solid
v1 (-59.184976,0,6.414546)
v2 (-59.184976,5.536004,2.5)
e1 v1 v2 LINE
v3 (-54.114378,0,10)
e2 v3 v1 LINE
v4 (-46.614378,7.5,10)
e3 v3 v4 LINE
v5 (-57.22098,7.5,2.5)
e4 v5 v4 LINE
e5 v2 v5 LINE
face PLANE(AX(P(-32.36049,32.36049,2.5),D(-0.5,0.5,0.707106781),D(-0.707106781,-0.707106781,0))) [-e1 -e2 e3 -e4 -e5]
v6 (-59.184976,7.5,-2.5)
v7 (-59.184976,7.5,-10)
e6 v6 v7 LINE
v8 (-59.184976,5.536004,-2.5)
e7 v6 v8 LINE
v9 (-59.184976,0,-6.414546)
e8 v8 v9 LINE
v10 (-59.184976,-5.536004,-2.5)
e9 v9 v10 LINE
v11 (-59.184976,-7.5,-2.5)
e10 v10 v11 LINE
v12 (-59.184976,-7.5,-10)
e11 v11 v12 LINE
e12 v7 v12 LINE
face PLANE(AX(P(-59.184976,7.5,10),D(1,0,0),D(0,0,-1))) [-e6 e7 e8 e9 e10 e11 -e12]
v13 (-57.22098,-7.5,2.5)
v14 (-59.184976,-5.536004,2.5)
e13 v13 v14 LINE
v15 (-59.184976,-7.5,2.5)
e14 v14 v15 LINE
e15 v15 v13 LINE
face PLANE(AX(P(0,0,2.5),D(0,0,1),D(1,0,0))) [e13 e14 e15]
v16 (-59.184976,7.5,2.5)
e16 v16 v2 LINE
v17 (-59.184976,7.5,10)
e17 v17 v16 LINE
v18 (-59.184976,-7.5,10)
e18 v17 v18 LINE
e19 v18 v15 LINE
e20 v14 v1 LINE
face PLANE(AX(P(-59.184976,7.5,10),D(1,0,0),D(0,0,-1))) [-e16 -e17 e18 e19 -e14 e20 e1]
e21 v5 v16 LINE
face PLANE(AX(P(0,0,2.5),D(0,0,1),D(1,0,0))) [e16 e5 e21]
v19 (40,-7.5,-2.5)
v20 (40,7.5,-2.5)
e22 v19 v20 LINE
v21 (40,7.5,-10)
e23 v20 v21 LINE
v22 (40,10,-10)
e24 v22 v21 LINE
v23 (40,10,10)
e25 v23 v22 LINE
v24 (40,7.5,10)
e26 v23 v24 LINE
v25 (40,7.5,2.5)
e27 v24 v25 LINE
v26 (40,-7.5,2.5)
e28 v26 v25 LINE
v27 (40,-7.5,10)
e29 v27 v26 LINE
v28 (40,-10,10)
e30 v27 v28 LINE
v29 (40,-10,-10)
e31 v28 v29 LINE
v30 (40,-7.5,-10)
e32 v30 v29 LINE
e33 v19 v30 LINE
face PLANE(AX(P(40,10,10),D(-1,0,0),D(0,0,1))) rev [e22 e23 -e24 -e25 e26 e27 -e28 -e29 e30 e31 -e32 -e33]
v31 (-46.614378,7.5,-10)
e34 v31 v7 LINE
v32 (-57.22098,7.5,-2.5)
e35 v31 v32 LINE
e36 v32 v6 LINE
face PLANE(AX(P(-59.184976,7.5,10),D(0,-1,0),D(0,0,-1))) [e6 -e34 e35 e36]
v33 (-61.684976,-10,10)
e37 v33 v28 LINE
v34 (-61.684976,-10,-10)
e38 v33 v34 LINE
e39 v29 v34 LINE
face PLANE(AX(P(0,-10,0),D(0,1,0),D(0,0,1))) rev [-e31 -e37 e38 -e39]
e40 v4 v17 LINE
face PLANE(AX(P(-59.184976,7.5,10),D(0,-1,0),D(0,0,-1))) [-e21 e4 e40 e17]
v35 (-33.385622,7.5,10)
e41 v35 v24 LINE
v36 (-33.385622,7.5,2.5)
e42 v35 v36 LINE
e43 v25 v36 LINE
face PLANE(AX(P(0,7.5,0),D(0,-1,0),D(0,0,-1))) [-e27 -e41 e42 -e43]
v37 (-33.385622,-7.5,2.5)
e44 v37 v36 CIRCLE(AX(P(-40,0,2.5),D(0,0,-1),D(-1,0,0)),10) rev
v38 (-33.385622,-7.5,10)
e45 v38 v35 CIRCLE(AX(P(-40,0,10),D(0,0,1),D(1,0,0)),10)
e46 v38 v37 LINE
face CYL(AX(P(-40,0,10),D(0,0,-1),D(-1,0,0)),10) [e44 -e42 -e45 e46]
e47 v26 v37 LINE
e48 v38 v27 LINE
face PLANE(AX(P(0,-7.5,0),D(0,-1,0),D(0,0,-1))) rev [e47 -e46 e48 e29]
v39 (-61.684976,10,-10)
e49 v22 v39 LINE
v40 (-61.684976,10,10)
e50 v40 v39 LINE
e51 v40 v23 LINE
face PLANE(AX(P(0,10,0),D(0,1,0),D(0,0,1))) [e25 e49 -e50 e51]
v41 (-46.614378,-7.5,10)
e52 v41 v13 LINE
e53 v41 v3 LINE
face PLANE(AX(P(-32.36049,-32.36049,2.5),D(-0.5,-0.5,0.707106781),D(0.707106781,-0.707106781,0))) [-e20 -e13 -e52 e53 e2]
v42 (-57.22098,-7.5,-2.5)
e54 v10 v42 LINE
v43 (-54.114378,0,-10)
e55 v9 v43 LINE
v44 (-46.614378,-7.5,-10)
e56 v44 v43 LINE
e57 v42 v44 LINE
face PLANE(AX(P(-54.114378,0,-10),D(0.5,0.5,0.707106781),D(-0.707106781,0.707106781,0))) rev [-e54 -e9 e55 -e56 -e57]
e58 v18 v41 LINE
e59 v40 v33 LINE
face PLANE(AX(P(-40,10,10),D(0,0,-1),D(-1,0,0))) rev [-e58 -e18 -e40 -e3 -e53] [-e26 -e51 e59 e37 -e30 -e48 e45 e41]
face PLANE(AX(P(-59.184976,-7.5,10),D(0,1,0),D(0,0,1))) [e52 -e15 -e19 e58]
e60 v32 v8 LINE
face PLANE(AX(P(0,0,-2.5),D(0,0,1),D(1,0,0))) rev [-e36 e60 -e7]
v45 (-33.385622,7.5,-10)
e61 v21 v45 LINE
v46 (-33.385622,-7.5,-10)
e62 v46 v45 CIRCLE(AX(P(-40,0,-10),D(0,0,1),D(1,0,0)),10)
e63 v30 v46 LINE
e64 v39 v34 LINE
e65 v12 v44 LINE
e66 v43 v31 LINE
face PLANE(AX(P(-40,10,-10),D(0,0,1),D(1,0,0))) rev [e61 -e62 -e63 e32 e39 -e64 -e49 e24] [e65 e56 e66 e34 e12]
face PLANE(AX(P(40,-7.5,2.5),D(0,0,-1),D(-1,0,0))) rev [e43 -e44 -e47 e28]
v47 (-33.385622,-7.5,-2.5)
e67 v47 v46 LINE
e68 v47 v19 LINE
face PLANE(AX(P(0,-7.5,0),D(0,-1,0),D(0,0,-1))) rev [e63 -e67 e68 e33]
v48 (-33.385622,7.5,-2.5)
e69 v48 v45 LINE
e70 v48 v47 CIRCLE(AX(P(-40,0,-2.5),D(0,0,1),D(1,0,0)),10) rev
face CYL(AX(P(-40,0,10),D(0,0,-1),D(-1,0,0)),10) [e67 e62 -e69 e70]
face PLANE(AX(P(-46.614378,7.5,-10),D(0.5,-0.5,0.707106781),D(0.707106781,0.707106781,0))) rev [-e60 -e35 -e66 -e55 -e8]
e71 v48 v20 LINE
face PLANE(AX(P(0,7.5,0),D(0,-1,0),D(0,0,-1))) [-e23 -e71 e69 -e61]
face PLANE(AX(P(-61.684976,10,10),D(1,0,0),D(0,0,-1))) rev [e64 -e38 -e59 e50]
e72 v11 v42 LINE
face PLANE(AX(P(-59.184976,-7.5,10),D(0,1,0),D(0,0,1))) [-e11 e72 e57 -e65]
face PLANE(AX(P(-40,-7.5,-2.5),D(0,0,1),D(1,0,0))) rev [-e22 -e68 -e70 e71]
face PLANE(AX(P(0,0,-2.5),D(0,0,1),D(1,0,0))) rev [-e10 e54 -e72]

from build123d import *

# Parameters (mm, degrees)
SKETCH1_W           = 80
SKETCH1_H           = 20
BOSS_EXTRUDE1_DEPTH = 10
SKETCH2_W           = 80
SKETCH2_H           = 7.5
CUT_EXTRUDE1_DEPTH  = 7.5
BOSS_EXTRUDE2_DEPTH = 10
SKETCH4_W           = 25.799353936
SKETCH4_H           = 15
BOSS_EXTRUDE3_DEPTH = 2.5
CHAMFER1_SIZE       = 7.5


# Some blends are built 0.0001 mm under size
with BuildPart() as part:
    # Sketch1 → Boss-Extrude1 (new, symmetric)
    with BuildSketch(Plane(origin=(0, 0, 0), x_dir=(1, 0, 0), z_dir=(0, 1, 0))):
        Rectangle(SKETCH1_W, SKETCH1_H)
    extrude(amount=BOSS_EXTRUDE1_DEPTH, both=True)

    # Sketch2 → Cut-Extrude1 (cut, symmetric)
    with BuildSketch(Plane(origin=(0, 0, 0), x_dir=(1, 0, 0), z_dir=(0, 1, 0))):
        with Locations((0, 6.25)):
            Rectangle(SKETCH2_W, SKETCH2_H)
        with Locations((0, -6.25)):
            Rectangle(SKETCH2_W, SKETCH2_H)
    extrude(amount=CUT_EXTRUDE1_DEPTH, both=True, mode=Mode.SUBTRACT)

    # Sketch3 → Boss-Extrude2 (add, symmetric)
    with BuildSketch(Plane.XY):
        with BuildLine():
            Line((-40, 10), (-61.684975658, 10))
            Line((-61.684975658, 10), (-61.684975658, -10))
            Line((-61.684975658, -10), (-40, -10))
            ThreePointArc((-40, -10), (-30, 0), (-40, 10))
        make_face()
        Polygon((-46.614378278, 7.5), (-54.114378278, 0), (-46.614378278, -7.5), (-59.184975658, -7.5), (-59.184975658, 7.5), align=None, mode=Mode.SUBTRACT)
    extrude(amount=BOSS_EXTRUDE2_DEPTH, both=True)

    # Sketch4 → Boss-Extrude3 (add, symmetric)
    with BuildSketch(Plane.XY):
        with Locations((-46.28529869, 0)):
            Rectangle(SKETCH4_W, SKETCH4_H)
    extrude(amount=BOSS_EXTRUDE3_DEPTH, both=True)

    # Chamfer1
    # the kernel refuses this chamfer: 7.5 mm, written as the material it adds along each edge
    with BuildSketch(Plane(origin=(-54.114378278, 0, 2.5), x_dir=(0.019442520806014087, 0.019442520806013695, 0.9996219169112968), z_dir=(0.7071067811865405, -0.7071067811865547, 0))) as chamfer1_piece_1_section:
        with BuildLine():
            Line((7.715048964, 0), (-0.424103662, 7.703383451))
            Line((-0.424103662, 7.703383451), (-0.574046949, 7.69925907))
            ThreePointArc((-0.574046949, 7.69925907), (-0.255969203, 3.850483722), (-0.149943288, -0.004124381))
            Line((-0.149943288, -0.004124381), (0.004124381, -0.149943288))
            ThreePointArc((0.004124381, -0.149943288), (3.858732485, -0.043917372), (7.719173345, -0.149943288))
            Line((7.719173345, -0.149943288), (7.715048964, 0))
        make_face()
    chamfer1_piece_1 = extrude(amount=29.894224128, mode=Mode.PRIVATE)
    chamfer1_piece_1 = split(chamfer1_piece_1, bisect_by=Plane(origin=(-52.527454049, -4.471025257, 10), z_dir=(0, 0, -1)), keep=Keep.TOP, mode=Mode.PRIVATE)
    chamfer1_piece_1 = split(chamfer1_piece_1, bisect_by=Plane(origin=(-52.527454049, -7.5, 5.197194263), z_dir=(0, 1, 0)), keep=Keep.TOP, mode=Mode.PRIVATE)
    add(chamfer1_piece_1)
    chamfer1_2_edges = [part.edges().sort_by_distance(p)[0] for p in [
        (-52.899676968, 1.21470131, 2.5),
    ]]
    chamfer(chamfer1_2_edges, length=CHAMFER1_SIZE - 0.0001)  # a hair under: the kernel refuses the full size
    # the kernel refuses this chamfer: 7.5 mm, written as the material it adds along each edge
    with BuildSketch(Plane(origin=(-54.114378278, 0, -2.5), x_dir=(0.019442520806014087, 0.019442520806013695, -0.9996219169112968), z_dir=(0.7071067811865405, -0.7071067811865547, 0))) as chamfer1_3_piece_1_section:
        with BuildLine():
            Line((7.715048964, 0), (-0.424103662, -7.703383451))
            Line((-0.424103662, -7.703383451), (-0.574046949, -7.69925907))
            ThreePointArc((-0.574046949, -7.69925907), (-0.255969203, -3.850483722), (-0.149943288, 0.004124381))
            Line((-0.149943288, 0.004124381), (0.004124381, 0.149943288))
            ThreePointArc((0.004124381, 0.149943288), (3.858732485, 0.043917372), (7.719173345, 0.149943288))
            Line((7.719173345, 0.149943288), (7.715048964, 0))
        make_face()
    chamfer1_3_piece_1 = extrude(amount=29.894224128, mode=Mode.PRIVATE)
    chamfer1_3_piece_1 = split(chamfer1_3_piece_1, bisect_by=Plane(origin=(-52.527454049, -4.471025257, -10), z_dir=(0, 0, 1)), keep=Keep.TOP, mode=Mode.PRIVATE)
    chamfer1_3_piece_1 = split(chamfer1_3_piece_1, bisect_by=Plane(origin=(-52.527454049, -7.5, -5.197194263), z_dir=(0, 1, 0)), keep=Keep.TOP, mode=Mode.PRIVATE)
    add(chamfer1_3_piece_1)
    chamfer1_4_edges = [part.edges().sort_by_distance(p)[0] for p in [
        (-52.899676968, 1.21470131, -2.5),
    ]]
    chamfer(chamfer1_4_edges, length=CHAMFER1_SIZE - 0.0001)  # a hair under: the kernel refuses the full size


solid = part.part
